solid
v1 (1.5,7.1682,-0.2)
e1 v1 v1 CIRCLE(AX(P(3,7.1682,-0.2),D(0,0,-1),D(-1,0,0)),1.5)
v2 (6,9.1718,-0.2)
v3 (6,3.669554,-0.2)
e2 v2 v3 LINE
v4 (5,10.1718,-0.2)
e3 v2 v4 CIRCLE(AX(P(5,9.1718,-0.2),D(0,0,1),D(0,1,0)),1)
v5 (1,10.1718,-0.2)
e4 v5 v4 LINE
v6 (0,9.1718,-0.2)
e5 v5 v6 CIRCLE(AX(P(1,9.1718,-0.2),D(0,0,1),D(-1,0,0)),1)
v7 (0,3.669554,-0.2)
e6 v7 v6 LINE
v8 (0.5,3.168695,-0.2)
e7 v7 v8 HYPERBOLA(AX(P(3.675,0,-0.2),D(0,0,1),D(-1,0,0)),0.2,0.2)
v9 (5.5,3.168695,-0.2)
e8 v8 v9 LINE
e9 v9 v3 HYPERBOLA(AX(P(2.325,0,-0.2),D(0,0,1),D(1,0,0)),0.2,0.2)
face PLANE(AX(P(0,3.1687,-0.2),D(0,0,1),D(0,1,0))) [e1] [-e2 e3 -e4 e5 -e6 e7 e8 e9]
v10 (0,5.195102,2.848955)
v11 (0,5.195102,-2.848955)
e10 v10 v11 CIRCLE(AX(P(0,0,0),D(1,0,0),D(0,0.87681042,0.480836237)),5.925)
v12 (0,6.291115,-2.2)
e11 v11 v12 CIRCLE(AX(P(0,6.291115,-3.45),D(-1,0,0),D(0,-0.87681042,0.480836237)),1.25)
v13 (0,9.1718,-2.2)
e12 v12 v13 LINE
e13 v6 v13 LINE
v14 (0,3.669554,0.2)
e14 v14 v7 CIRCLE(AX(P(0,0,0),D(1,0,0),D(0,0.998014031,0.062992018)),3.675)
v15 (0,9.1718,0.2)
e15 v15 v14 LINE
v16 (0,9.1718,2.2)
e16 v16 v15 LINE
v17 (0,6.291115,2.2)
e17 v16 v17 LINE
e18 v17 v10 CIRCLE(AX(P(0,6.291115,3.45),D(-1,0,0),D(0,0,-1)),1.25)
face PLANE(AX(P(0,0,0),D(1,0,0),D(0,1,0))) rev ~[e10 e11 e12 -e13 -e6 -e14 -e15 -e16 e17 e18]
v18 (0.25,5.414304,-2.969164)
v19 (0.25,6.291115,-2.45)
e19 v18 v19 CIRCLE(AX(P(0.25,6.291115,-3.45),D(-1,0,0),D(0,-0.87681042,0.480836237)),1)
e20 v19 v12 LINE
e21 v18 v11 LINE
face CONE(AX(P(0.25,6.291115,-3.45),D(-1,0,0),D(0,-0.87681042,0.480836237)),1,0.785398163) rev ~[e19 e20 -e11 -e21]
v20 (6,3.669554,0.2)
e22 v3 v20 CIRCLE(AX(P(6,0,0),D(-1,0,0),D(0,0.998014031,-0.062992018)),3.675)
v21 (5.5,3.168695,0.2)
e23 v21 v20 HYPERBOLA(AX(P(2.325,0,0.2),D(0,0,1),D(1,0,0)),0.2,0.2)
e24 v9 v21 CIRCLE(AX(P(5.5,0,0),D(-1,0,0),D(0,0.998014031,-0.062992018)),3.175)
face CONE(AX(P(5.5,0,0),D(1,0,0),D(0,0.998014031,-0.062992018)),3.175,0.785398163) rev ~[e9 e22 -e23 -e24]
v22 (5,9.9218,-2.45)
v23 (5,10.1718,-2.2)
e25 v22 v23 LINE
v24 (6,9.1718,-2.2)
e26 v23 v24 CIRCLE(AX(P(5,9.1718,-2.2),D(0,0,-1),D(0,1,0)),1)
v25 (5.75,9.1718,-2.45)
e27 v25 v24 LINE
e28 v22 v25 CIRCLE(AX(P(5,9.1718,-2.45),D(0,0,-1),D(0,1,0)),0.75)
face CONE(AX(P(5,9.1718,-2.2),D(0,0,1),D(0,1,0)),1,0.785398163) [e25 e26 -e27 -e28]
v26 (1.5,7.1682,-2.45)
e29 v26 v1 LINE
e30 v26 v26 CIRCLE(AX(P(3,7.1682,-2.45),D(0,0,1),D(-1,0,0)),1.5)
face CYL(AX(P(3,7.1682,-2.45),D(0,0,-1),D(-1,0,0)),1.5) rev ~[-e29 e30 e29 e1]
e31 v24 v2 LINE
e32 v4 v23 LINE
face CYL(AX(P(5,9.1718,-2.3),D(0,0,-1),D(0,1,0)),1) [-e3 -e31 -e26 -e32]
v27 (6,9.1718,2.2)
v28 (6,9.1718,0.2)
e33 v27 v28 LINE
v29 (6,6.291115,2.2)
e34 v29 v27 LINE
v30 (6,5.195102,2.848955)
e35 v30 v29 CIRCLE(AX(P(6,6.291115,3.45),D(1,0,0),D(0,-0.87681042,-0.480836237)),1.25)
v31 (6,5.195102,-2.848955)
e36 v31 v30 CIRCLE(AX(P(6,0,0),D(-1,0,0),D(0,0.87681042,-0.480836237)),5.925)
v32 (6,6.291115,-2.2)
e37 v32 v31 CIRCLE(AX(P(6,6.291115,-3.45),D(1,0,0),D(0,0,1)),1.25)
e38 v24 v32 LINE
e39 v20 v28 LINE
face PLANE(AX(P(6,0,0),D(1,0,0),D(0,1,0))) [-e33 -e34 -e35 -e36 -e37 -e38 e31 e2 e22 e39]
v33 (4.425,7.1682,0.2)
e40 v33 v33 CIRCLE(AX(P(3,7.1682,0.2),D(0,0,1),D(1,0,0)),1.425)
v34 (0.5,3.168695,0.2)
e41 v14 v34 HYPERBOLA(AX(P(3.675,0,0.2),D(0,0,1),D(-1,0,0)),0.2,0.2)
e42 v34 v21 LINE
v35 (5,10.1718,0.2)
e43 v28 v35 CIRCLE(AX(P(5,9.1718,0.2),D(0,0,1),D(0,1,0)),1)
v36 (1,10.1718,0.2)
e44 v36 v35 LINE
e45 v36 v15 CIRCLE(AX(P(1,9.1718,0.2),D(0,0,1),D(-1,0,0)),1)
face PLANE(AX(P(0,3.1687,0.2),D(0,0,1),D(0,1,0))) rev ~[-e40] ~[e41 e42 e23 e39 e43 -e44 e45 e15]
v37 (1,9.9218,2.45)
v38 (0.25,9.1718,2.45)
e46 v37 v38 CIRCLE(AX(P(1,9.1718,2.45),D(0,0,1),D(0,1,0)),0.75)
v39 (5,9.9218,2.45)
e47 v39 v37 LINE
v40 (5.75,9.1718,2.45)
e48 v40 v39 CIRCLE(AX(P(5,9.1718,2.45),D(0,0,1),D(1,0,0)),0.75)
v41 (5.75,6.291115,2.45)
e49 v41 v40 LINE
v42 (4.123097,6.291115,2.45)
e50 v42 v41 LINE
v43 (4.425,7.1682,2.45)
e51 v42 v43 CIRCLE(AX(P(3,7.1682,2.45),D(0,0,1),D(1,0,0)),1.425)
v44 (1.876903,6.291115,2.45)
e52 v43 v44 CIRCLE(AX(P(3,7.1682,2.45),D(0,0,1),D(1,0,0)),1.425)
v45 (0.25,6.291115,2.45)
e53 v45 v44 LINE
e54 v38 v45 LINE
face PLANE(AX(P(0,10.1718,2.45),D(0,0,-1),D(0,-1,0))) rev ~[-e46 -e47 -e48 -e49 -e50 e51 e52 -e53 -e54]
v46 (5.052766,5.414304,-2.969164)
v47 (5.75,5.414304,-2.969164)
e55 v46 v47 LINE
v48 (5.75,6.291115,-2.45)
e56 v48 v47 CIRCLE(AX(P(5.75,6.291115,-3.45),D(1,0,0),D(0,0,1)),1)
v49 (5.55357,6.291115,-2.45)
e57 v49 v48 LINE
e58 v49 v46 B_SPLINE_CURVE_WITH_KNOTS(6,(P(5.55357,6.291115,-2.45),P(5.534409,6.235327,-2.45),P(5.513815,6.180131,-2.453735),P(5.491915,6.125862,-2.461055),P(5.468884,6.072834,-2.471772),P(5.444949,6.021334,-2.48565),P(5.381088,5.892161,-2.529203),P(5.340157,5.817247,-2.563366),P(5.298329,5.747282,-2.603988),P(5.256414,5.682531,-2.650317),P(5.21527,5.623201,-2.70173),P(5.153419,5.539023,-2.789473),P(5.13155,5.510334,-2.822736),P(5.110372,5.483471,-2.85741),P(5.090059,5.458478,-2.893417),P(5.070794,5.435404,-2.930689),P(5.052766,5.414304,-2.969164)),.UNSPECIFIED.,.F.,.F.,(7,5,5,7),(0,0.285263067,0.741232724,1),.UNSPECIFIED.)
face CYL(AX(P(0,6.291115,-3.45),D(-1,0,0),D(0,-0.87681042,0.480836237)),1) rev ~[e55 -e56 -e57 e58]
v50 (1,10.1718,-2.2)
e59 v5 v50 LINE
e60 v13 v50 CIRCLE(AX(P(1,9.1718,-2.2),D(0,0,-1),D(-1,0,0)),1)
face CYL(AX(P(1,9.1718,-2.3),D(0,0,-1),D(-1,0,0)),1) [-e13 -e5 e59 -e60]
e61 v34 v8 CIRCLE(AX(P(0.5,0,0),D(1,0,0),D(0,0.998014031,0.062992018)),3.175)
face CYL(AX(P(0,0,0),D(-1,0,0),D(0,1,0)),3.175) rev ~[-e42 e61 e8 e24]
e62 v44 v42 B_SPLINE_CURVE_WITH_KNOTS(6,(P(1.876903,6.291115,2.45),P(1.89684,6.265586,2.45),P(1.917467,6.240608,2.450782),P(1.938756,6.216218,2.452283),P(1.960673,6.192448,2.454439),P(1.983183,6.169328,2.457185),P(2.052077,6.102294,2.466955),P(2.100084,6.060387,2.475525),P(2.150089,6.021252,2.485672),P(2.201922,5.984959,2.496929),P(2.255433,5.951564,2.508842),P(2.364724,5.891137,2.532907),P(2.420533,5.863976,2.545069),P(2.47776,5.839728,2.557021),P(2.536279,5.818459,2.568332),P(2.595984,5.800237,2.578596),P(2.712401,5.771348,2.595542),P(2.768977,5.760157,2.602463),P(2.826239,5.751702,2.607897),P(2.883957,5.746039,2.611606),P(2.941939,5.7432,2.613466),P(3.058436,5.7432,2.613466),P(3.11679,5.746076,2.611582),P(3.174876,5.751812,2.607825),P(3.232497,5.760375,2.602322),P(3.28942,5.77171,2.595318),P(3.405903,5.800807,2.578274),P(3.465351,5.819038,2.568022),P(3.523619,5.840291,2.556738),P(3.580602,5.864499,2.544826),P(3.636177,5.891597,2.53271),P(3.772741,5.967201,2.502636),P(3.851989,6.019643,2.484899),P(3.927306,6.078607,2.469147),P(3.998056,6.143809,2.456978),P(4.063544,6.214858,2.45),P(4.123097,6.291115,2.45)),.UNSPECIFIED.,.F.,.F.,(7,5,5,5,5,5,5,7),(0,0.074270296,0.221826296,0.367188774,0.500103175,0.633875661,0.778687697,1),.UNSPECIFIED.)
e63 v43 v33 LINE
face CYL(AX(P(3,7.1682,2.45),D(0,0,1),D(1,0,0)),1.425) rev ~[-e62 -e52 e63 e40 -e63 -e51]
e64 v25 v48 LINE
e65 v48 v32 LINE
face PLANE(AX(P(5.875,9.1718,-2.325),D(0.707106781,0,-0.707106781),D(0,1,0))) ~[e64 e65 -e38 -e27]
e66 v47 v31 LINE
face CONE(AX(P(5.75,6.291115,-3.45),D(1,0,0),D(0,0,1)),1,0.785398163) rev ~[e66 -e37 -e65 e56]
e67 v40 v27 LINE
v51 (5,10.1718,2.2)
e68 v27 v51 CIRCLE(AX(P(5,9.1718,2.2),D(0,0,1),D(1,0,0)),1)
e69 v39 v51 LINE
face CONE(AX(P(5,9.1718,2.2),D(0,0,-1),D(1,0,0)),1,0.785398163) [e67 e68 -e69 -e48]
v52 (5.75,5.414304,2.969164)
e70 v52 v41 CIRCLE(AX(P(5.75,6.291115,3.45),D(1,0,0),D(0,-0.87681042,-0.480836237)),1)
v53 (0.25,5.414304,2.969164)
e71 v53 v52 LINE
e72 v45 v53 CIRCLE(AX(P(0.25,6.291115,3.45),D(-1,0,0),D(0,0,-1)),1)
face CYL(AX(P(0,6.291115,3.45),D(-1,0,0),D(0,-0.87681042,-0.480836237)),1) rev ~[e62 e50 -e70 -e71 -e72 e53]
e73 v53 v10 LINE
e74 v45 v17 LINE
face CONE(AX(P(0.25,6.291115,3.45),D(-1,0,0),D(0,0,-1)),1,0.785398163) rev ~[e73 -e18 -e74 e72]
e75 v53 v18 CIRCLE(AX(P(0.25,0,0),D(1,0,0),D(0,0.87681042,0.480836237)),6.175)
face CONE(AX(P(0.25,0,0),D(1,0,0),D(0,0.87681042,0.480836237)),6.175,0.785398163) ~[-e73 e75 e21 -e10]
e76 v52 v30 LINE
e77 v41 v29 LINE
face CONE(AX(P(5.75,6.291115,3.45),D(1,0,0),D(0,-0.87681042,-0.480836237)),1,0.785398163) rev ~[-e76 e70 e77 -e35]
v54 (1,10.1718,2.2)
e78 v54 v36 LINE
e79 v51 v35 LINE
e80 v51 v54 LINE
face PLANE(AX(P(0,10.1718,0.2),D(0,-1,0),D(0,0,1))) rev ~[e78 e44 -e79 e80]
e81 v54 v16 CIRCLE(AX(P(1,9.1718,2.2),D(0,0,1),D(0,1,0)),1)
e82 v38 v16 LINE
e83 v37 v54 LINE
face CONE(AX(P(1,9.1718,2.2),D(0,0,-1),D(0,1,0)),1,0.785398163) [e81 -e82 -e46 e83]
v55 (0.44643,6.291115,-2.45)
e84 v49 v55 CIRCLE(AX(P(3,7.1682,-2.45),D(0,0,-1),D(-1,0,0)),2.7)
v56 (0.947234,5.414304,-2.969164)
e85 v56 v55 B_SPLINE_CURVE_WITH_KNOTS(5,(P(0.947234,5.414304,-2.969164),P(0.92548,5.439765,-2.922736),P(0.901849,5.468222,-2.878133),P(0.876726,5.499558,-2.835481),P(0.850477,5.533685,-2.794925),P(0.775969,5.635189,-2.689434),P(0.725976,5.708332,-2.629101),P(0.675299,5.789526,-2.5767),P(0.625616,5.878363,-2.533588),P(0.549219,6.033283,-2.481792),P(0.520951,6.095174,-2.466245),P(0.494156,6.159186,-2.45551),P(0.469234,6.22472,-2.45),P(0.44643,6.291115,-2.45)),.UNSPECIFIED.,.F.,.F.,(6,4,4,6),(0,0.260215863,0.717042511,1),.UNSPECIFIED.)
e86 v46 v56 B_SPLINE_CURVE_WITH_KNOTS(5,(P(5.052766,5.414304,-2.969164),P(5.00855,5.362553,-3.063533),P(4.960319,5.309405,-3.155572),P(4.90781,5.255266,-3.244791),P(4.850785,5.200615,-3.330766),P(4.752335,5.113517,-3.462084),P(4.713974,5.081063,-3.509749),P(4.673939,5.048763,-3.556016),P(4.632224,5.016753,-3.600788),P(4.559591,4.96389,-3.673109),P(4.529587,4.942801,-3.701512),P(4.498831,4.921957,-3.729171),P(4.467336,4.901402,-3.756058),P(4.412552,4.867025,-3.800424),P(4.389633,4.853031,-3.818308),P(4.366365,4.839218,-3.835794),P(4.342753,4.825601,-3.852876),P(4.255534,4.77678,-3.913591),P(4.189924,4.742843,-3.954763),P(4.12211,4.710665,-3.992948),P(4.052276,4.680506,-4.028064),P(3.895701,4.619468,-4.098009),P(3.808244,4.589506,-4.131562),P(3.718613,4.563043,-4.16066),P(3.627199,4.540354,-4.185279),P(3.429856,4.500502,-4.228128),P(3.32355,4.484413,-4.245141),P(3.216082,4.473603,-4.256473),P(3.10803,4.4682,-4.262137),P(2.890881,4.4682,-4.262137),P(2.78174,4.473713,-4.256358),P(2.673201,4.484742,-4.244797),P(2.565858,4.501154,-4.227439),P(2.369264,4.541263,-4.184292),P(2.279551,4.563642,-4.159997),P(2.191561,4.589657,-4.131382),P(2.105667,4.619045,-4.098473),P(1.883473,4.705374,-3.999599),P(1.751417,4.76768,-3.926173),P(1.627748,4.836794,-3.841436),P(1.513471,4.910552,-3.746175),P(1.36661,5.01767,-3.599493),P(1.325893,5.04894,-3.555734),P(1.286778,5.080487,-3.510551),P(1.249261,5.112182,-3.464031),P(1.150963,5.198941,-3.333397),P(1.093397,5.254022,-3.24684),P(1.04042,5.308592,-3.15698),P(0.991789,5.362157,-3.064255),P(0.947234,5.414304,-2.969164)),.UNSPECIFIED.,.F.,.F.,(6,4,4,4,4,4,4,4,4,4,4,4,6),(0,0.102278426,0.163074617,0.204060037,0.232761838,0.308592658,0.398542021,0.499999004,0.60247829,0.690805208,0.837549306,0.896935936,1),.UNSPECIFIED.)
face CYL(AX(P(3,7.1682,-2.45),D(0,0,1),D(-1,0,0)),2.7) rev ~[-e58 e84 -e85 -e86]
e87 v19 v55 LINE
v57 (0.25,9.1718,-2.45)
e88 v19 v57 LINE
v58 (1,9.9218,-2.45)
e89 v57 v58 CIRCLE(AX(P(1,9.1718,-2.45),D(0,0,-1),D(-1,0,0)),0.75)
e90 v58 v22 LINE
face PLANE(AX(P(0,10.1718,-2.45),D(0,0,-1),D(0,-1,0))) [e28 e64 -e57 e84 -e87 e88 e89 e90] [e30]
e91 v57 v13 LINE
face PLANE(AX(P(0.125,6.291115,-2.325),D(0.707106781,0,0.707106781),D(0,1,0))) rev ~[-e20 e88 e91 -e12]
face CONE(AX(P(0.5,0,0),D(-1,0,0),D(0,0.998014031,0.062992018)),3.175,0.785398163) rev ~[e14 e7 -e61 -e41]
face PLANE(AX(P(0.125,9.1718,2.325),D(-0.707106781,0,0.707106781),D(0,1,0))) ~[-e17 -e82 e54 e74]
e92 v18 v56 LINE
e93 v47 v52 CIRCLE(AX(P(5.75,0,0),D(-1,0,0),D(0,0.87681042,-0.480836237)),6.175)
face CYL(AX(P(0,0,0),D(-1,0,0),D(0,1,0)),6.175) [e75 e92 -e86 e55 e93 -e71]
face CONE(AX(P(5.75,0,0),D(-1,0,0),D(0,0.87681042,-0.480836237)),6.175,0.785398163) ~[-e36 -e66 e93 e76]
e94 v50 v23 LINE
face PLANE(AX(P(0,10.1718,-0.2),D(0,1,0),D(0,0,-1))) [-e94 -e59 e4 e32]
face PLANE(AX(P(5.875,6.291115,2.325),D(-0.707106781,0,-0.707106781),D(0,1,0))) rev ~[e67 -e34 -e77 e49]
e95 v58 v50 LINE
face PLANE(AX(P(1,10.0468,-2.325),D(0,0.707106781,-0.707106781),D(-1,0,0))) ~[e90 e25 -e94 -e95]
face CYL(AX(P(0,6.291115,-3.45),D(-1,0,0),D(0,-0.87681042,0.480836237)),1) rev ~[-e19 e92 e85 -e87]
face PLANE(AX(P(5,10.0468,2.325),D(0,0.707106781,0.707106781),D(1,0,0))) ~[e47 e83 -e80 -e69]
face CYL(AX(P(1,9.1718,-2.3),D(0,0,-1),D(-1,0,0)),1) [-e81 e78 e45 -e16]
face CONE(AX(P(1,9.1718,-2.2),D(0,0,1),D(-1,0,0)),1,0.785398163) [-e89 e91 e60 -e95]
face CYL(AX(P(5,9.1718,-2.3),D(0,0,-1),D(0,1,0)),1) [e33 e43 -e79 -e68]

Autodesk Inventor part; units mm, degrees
ref_plane "YZ Plane" through (0, 0, 0) normal (1, 0, 0) x (0, 1, 0)
ref_plane "XZ Plane" through (0, 0, 0) normal (0, 1, 0) x (-1, 0, 0)
ref_plane "XY Plane" through (0, 0, 0) normal (0, 0, 1) x (1, 0, 0)
sketch "Sketch1" plane through (0, 0, 0) normal (1, 0, 0) x (0, 1, 0)
  line L0 (0, 8.645) -> (0, -8.645) projected
  line L1 (-9.4444, 0) -> (13.4411, 0) projected
  circle A0 centre (0, 0) radius 6.175
  circle A1 centre (0, 0) radius 3.175
  line L2 (3.1687, -0.2) -> (6.1718, -0.2)
  line L3 (3.1687, 0.2) -> (6.1718, 0.2)
  line L4 (6.1718, 0.2) -> (10.1718, 0.2)
  line L5 (10.1718, 0.2) -> (10.1718, 2.45)
  line L6 (10.1718, 2.45) -> (5.6682, 2.45)
  line L7 (6.1718, -0.2) -> (10.1718, -0.2)
  line L8 (10.1718, -0.2) -> (10.1718, -2.45)
  line L9 (10.1718, -2.45) -> (5.6682, -2.45)
  dimension "d0" = 6.35
  dimension "d1" = 3
  dimension "d2" = 0.2
  dimension "d3" = 4
  dimension "d4" = 2.25
extrude "Extrusion1" add sketch "Sketch1" along normal blind 6 contours A0 L3 A1 L0 | L0 A1 L1 A0 | L6 L5 L4 A0 | L1 A1 L0 A0 | L0 A1 L2 A0 | A0 L7 L8 L9
sketch "Sketch2" plane through (0, 5.6682, -2.45) normal (0, 0, -1) x (-1, 0, 0)
  line L0 (0, 4.5036) -> (-6, 4.5036) projected
  circle A0 centre (-3, 1.5) radius 1.5
  circle A1 centre (-3, 1.5) radius 2.6 construction
  line L1 (0, 0) -> (-6, 0) projected
  point P0 (0, -5.6682)
  point P1 (-3, 4.5036)
  dimension "d8" = 3
  dimension "d24" = 5.2
extrude "Extrusion2" cut sketch "Sketch2" against normal up to surface (2.25 mm away)
sketch "Sketch4" plane through (0, 5.6682, 2.45) normal (0, 0, 1) x (1, 0, 0)
  circle A0 centre (3, 1.5) radius 1.5 projected
  circle A1 centre (3, 1.5) radius 1.5 projected
  circle A2 centre (3, 1.5) radius 1.425
  point P0 (0, -5.6682)
  point P1 (3, 0)
  dimension "d14" = 2.85
extrude "Extrusion4" cut sketch "Sketch4" against normal through all contours A2
fillet "Fillet2" radius 1 7 edges at (6, 10.1718, 1.325) (3, 5.6682, 2.45) (0, 10.1718, 1.325) (0, 10.1718, -1.325) (6, 10.1718, -1.325) (1.5, 5.6682, -2.45) (4.5, 5.6682, -2.45)
chamfer "Chamfer1" distance 0.5 angle 45 2 edges at (6, -3.175, 0) (0, -3.175, 0)
sketch "Sketch5" plane through (0, 6.2911, -2.45) normal (0, 0, -1) x (-1, 0, 0)
  arc A0 (-1.7831, 0) -> (-4.2169, 0) centre (-3, 0.8771) ccw projected
  circle A1 centre (-3, 0.8771) radius 2.7
  circle A2 centre (-3, 0.8771) radius 1.5
  point P0 (0, -6.2911)
  dimension "d25" = 5.4
extrude "Extrusion5" cut sketch "Sketch5" along normal through all contours A2 A0 | A1
chamfer "Chamfer2" distance 0.25 angle 45 16 edges at (6, -6.175, 0) (6, 9.1718, -1.325) (6, 7.7314, -2.45) (5.7071, 9.8789, -2.45) (3, 10.1718, -2.45) (0.2929, 9.8789, -2.45) (0, 7.7314, -2.45) (0, 9.1718, -1.325) (0, -6.175, 0) (0, 9.1718, 1.325) (0, 7.7314, 2.45) (0.2929, 9.8789, 2.45) (3, 10.1718, 2.45) (5.7071, 9.8789, 2.45) (6, 7.7314, 2.45) (6, 9.1718, 1.325)
sketch "Sketch3" plane through (0, 5.6682, 2.45) normal (0, 0, 1) x (1, 0, 0)
  circle A0 centre (2.5, 3.2518) radius 1.5 projected
  circle A1 centre (2.5, 3.2518) radius 1.5 projected
  line L0 (4.3187, 6.4018) -> (6.1373, 3.2518)
  line L1 (6.1373, 3.2518) -> (4.3187, 0.1018)
  line L2 (4.3187, 0.1018) -> (0.6813, 0.1018)
  line L3 (0.6813, 0.1018) -> (-1.1373, 3.2518)
  line L4 (-1.1373, 3.2518) -> (0.6813, 6.4018)
  line L5 (0.6813, 6.4018) -> (4.3187, 6.4018)
  point P0 (0, -5.6682)
  dimension "d11" = 6.3
properties part number "pipeClap"
